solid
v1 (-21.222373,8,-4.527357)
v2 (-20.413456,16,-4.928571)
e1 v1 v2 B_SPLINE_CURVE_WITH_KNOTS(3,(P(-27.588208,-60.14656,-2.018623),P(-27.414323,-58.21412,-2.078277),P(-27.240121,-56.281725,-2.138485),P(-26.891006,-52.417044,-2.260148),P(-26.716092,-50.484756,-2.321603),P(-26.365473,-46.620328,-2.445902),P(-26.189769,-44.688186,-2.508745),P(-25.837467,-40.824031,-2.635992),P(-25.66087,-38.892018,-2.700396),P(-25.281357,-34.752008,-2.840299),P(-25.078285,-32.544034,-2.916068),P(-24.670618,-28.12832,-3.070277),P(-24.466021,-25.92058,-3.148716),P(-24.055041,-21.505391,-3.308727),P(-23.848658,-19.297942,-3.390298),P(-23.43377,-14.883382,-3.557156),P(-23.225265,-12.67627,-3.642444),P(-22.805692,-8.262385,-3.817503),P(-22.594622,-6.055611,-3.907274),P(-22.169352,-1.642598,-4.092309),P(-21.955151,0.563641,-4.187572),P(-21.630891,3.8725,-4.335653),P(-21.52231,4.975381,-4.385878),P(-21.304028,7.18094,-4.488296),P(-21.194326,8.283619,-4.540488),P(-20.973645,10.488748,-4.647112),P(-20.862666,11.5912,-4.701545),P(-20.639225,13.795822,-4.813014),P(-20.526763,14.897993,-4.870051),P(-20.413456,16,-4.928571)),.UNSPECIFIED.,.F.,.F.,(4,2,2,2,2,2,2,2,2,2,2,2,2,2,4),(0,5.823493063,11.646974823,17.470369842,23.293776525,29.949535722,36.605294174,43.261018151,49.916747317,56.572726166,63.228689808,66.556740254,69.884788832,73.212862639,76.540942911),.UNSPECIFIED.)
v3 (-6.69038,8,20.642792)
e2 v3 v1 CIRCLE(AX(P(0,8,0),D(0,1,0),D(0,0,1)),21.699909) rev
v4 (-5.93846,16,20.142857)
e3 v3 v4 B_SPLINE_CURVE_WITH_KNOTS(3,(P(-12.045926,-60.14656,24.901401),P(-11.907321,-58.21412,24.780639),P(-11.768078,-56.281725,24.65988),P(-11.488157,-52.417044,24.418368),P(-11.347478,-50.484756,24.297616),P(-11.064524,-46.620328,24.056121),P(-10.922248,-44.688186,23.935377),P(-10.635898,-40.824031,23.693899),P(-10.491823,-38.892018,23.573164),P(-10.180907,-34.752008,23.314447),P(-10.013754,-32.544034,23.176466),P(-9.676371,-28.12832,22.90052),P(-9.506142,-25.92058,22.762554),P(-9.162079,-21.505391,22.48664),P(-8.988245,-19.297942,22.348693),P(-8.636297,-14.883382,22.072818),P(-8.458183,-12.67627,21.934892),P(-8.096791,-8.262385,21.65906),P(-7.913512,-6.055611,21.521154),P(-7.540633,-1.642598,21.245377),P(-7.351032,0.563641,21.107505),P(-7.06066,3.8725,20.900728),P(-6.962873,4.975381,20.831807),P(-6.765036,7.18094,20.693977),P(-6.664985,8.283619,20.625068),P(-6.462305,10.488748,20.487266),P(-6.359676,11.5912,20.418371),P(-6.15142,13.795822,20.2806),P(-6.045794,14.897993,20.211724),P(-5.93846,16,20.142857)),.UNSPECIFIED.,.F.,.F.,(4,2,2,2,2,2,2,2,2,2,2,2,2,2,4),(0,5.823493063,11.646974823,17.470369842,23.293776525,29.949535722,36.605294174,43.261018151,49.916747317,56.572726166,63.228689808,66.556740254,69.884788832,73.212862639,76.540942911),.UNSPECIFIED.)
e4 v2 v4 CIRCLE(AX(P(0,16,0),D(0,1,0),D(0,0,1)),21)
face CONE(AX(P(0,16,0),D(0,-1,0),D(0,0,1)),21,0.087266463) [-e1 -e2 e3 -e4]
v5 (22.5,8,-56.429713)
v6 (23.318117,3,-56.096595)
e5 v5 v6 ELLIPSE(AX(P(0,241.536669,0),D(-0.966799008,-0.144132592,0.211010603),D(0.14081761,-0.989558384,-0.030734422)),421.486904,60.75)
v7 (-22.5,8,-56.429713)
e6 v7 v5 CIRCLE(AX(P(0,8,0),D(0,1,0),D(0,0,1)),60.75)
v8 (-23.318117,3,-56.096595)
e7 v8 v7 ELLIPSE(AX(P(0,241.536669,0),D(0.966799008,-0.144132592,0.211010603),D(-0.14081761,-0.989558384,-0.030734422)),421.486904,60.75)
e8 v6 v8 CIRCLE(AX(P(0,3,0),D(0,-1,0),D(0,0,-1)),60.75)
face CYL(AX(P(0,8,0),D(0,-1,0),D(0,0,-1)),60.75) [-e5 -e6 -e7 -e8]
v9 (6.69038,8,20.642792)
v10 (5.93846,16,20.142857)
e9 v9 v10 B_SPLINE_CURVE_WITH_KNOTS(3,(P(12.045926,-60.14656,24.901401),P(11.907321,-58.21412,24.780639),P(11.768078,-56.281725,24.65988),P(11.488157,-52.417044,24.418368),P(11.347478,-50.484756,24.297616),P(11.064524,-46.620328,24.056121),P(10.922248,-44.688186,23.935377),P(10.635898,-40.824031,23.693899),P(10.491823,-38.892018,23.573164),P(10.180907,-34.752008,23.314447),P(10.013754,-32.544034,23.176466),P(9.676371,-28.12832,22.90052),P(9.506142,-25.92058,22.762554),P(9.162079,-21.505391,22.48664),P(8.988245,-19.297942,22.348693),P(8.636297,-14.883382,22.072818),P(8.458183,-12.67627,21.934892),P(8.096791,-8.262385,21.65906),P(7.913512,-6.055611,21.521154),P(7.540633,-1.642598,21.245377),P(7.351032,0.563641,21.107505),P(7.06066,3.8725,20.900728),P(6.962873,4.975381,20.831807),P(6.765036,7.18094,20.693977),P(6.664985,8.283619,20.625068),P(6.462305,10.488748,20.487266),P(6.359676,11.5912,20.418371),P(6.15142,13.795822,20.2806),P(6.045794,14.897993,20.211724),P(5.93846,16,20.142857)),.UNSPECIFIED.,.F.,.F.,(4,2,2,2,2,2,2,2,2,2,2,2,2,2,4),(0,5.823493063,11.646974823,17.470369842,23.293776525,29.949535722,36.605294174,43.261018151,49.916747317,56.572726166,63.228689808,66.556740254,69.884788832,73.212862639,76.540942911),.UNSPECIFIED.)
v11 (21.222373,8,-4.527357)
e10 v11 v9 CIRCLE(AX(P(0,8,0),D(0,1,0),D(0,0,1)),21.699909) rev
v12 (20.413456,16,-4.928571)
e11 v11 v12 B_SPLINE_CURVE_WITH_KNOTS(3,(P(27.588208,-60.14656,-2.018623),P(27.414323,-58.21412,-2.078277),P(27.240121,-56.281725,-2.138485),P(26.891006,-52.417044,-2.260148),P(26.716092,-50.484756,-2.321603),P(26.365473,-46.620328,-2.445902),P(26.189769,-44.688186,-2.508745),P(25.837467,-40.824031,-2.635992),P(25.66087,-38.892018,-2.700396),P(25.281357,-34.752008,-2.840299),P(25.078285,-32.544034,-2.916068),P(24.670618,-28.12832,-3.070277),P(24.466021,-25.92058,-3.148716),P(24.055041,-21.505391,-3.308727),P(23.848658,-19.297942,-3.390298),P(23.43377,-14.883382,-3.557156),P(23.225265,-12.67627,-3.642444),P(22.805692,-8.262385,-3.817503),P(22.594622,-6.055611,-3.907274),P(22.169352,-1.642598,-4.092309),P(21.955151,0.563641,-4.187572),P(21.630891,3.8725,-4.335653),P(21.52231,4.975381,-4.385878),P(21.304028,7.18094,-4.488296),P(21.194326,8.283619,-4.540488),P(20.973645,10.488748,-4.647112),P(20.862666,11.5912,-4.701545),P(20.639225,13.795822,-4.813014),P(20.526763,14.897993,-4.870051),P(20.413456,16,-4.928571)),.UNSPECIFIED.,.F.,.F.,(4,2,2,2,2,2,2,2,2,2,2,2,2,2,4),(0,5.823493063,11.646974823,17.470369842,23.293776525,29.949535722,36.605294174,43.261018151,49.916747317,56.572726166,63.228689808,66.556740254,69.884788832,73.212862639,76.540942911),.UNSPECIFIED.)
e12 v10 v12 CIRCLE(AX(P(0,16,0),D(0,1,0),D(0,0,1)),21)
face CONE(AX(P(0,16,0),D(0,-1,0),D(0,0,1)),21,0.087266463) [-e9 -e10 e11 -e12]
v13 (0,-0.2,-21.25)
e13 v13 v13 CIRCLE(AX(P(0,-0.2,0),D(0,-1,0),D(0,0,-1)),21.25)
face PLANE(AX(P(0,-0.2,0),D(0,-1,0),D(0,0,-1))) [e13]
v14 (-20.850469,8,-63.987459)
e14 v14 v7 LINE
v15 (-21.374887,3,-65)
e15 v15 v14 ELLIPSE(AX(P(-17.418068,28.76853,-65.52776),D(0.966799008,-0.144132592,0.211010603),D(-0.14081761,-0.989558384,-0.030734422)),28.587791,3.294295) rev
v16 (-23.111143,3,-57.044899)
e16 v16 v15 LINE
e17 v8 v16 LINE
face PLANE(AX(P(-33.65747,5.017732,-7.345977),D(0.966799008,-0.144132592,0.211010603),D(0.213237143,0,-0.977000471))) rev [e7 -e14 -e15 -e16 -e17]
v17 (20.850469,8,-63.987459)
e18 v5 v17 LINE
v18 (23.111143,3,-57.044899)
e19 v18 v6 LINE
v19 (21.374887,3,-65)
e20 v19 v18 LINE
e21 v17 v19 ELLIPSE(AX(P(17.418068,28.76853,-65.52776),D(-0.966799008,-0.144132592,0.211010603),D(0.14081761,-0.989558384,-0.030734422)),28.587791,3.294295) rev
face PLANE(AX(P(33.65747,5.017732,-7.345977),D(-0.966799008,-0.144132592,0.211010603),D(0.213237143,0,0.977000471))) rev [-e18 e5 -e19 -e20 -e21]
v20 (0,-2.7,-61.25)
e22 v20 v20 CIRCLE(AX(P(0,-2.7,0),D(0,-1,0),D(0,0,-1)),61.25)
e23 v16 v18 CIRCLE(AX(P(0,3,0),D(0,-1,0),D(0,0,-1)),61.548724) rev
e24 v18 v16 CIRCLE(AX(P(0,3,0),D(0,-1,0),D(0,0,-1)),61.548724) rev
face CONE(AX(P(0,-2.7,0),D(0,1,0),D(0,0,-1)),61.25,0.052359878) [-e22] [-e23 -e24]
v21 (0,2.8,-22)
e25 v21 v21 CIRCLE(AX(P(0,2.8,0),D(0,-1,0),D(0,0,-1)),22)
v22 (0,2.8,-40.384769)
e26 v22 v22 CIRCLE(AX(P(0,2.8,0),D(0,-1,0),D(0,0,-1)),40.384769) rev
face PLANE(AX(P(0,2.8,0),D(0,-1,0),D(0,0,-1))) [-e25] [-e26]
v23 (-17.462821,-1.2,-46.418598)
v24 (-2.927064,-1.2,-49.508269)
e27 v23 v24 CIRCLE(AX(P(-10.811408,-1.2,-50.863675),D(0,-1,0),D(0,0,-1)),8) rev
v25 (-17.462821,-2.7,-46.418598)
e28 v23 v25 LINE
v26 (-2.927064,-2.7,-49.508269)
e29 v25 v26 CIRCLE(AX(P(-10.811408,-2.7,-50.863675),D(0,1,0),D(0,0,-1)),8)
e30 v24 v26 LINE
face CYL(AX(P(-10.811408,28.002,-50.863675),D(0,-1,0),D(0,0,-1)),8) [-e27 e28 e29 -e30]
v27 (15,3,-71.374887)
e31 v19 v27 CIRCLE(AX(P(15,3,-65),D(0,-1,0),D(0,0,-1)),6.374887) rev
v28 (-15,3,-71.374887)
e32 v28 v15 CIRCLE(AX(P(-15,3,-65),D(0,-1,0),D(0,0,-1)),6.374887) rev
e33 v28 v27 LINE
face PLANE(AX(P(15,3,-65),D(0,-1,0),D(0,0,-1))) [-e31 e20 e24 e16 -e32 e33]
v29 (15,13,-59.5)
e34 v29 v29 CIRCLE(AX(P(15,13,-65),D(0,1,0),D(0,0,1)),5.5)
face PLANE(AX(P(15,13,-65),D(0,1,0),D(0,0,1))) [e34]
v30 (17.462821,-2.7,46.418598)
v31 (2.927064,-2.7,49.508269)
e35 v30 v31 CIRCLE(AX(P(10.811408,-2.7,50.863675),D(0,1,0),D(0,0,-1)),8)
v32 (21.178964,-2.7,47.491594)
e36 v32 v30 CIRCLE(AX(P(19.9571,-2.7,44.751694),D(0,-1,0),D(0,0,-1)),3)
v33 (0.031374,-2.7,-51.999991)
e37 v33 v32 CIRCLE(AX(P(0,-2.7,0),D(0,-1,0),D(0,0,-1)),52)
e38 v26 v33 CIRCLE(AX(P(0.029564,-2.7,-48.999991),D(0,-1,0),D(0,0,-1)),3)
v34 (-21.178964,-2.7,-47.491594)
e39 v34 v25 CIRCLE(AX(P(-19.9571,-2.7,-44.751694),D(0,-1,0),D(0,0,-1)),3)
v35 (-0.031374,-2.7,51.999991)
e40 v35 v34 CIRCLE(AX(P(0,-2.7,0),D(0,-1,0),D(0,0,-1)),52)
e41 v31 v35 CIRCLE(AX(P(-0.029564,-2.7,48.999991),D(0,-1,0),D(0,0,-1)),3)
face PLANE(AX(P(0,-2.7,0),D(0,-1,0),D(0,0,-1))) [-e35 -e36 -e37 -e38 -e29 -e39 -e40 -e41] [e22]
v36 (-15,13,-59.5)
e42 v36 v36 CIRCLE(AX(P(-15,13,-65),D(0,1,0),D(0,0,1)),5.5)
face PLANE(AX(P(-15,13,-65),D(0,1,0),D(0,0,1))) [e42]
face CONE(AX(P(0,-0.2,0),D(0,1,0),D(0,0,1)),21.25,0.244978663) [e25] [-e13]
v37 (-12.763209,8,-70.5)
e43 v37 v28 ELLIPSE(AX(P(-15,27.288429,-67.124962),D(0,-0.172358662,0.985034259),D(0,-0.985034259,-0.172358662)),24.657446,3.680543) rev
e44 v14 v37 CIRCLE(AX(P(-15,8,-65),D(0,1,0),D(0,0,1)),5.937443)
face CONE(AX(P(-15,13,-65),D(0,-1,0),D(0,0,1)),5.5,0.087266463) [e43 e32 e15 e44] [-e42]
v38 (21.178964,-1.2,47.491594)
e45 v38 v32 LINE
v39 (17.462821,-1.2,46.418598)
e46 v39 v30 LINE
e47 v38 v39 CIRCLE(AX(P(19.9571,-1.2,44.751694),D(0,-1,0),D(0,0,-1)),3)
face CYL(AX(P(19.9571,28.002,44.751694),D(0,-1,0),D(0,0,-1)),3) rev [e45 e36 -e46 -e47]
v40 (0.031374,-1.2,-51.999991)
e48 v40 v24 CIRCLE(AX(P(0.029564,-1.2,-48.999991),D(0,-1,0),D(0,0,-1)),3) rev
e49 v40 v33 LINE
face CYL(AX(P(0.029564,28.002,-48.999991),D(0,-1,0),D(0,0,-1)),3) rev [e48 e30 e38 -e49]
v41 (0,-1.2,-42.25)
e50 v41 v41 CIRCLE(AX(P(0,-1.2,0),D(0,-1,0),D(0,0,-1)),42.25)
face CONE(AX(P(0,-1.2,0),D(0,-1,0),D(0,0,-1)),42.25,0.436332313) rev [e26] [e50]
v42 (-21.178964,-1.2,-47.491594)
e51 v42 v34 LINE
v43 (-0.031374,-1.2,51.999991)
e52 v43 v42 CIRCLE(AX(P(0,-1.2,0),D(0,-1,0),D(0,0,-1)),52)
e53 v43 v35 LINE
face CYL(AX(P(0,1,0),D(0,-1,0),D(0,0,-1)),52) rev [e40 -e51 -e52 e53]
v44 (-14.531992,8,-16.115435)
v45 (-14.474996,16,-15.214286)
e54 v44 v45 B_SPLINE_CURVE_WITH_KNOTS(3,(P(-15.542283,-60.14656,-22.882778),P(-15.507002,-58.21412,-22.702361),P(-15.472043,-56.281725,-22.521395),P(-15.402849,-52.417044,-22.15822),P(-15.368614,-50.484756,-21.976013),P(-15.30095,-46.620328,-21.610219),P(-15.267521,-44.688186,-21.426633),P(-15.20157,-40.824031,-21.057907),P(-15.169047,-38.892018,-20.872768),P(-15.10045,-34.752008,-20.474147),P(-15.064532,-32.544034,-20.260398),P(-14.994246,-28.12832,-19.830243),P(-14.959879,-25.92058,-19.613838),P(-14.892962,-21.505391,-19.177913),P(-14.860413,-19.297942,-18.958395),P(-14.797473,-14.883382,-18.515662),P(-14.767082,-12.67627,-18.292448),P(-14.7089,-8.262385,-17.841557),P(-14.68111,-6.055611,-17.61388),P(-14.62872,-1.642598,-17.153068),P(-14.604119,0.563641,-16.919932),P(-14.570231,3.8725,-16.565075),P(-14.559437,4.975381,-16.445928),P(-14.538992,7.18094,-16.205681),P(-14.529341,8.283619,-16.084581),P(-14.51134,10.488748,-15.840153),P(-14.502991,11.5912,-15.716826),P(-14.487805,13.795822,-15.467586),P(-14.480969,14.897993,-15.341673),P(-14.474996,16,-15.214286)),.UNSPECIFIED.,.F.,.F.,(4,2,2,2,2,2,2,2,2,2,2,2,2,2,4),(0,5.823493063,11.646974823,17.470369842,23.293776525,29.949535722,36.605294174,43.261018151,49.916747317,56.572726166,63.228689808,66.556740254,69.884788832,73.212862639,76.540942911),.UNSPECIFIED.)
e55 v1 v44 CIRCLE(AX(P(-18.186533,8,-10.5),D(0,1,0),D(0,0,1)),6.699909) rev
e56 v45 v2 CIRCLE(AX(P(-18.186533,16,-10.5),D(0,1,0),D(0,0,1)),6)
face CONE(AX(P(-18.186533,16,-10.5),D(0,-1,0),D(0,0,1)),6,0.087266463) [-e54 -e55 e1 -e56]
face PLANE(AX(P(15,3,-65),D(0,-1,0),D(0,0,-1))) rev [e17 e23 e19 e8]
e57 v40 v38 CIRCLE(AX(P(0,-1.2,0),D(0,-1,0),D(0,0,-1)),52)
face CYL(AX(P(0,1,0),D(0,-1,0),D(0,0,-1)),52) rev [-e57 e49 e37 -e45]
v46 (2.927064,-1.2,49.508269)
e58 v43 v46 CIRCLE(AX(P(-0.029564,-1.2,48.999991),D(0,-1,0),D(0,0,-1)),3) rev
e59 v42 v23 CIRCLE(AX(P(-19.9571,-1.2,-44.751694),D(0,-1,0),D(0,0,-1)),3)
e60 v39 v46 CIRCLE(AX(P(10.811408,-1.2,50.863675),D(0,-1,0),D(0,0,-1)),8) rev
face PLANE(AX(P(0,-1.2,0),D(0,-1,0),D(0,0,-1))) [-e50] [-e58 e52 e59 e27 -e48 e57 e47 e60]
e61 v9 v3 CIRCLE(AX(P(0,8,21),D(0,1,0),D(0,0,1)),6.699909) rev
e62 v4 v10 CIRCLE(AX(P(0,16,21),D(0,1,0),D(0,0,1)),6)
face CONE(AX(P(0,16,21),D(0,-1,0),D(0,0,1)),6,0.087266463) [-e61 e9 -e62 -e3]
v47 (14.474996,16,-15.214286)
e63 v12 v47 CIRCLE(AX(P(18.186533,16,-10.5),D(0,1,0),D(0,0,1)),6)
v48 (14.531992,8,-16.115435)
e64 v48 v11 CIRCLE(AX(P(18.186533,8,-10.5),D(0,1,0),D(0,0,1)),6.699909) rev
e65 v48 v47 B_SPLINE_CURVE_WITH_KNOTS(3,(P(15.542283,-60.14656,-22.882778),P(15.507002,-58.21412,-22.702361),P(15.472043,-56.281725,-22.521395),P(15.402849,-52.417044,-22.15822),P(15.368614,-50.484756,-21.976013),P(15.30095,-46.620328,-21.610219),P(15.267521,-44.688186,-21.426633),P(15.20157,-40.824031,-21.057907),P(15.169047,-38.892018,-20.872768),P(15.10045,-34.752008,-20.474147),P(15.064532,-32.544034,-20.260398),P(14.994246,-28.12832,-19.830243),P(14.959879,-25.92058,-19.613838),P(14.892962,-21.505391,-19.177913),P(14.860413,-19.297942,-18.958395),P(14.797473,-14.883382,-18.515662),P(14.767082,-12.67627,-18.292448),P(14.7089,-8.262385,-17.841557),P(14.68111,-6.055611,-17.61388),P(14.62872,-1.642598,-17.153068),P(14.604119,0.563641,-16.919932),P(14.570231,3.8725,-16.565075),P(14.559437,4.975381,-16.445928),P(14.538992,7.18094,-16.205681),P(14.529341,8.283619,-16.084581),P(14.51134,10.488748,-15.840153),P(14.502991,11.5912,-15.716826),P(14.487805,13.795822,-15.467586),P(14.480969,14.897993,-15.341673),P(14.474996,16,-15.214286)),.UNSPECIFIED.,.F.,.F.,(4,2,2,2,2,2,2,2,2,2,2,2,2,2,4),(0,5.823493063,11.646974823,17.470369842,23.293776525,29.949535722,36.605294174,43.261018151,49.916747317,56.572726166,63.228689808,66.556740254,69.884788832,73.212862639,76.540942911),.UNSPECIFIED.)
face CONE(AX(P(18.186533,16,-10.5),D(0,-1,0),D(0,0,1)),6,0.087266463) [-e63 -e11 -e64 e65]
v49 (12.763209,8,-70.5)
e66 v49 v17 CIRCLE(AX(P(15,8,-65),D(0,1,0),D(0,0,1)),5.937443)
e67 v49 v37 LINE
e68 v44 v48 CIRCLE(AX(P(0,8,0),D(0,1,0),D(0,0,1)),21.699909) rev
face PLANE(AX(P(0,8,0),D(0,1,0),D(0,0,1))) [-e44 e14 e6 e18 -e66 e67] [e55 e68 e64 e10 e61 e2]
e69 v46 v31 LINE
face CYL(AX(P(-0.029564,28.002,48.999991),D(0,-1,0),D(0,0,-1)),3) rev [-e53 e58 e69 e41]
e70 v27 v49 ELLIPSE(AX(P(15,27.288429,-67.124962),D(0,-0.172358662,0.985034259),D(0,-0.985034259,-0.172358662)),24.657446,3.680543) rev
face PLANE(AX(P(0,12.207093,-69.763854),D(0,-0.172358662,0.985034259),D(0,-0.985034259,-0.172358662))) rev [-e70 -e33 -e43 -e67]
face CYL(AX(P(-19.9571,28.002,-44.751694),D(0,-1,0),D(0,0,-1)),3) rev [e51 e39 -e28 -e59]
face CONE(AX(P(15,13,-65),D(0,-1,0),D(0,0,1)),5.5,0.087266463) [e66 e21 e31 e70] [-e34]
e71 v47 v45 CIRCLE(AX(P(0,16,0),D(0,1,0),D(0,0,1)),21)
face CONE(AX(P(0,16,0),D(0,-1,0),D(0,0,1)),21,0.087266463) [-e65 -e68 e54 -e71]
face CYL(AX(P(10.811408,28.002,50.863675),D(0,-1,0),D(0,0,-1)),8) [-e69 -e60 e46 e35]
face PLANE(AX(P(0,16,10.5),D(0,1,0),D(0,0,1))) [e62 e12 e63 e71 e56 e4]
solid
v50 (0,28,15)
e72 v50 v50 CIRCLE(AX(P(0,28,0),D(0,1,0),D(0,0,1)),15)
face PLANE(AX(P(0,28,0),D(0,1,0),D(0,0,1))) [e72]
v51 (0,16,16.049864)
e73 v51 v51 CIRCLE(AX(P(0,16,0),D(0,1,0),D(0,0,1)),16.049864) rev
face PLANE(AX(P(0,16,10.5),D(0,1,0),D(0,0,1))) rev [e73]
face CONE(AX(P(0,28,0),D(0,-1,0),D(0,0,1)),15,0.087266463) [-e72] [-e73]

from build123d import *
from build123d.topology import SkipClean

# Parameters (mm, degrees)
SKETCH1_R                      = 60.75
BOSS_EXTRUDE1_DEPTH            = 8
BOSS_EXTRUDE3_DEPTH            = 8
SKETCH3_R                      = 15
SKETCH3_R_2                    = 10
BOSS_EXTRUDE4_DEPTH            = 12
BOSS_EXTRUDE5_START            = -5
BOSS_EXTRUDE5_DEPTH            = 5
SKETCH5_R                      = 5.500000000000001
SKETCH5_R_2                    = 5.499999999999997
BOSS_EXTRUDE6_DEPTH            = 5
SKETCH11_R                     = 52
CUT_EXTRUDE4_DEPTH             = 1
SKETCH12_R                     = 42.5
CUT_EXTRUDE5_DEPTH             = 4
BOSS_EXTRUDE7_START            = 2
SKETCH13_R                     = 21
SKETCH13_R_2                   = 10
BOSS_EXTRUDE7_DEPTH            = 2
BOSS_EXTRUDE8_START            = 2.2
SKETCH14_R                     = 60.75
SKETCH14_R_2                   = 52.000000000000014
BOSS_EXTRUDE8_DEPTH            = 2.2
BOSS_EXTRUDE9_START            = 2.2
SKETCH15_R                     = 52.000000000000014
SKETCH15_R_2                   = 42.500000000000014
BOSS_EXTRUDE9_DEPTH            = 2.2
BOSS_EXTRUDE10_START           = 2.2
SKETCH16_R                     = 42.50000000000002
SKETCH16_R_2                   = 21
BOSS_EXTRUDE10_DEPTH           = 2.2
BOSS_EXTRUDE11_START           = 2.2
SKETCH17_R                     = 21
SKETCH17_R_2                   = 10
BOSS_EXTRUDE11_DEPTH           = 2.2
BOSS_EXTRUDE12_REACH           = 99.841
SKETCH20_R                     = 14.5
CUT_EXTRUDE6_DEPTH             = 6
BOSS_EXTRUDE13_START           = 6
SKETCH22_R                     = 14.5
BOSS_EXTRUDE13_DEPTH           = 6
SKETCH23_R                     = 10
BOSS_EXTRUDE14_DEPTH           = 12
CUT_EXTRUDE7_START             = -12
SKETCH24_R                     = 15
CUT_EXTRUDE7_DEPTH             = 12
CUT_EXTRUDE8_START             = -8
CUT_EXTRUDE8_DEPTH             = 8
BOSS_EXTRUDE16_DEPTH           = 8
BOSS_EXTRUDE16_DRAFT           = 5
SKETCH25_R                     = 15
BOSS_EXTRUDE15_DEPTH           = 12
BOSS_EXTRUDE15_DRAFT           = 5.000000000000003
CUT_EXTRUDE9_START             = -5
SKETCH29_R                     = 5.500000000000004
SKETCH29_R_2                   = 5.499999999999987
CUT_EXTRUDE9_DEPTH             = 5
SKETCH30_R                     = 5.499999999999987
BOSS_EXTRUDE17_DEPTH           = 10
BOSS_EXTRUDE17_DRAFT           = 5.000000000000003
SKETCH30_R_2                   = 5.500000000000005
BOSS_EXTRUDE17_PROFILE_2_DEPTH = 10
BOSS_EXTRUDE17_PROFILE_2_DRAFT = 5.000000000000003
CUT_EXTRUDE14_START            = 10
SKETCH40_R                     = 42.75
SKETCH40_R_2                   = 21
CUT_EXTRUDE14_DEPTH            = 10
SKETCH43_R                     = 20.82502267294815
BOSS_EXTRUDE19_DEPTH           = 1
BOSS_EXTRUDE19_TAPER           = 5.000000000000003
SKETCH45_R                     = 61.25
SKETCH45_R_2                   = 60.75
BOSS_EXTRUDE21_DEPTH           = 5.7
BOSS_EXTRUDE21_DRAFT           = 3.000000000000002
BOSS_EXTRUDE22_START           = 0.5
SKETCH46_R                     = 60.75
BOSS_EXTRUDE22_DEPTH           = 0.5
SKETCH47_R                     = 22
SKETCH48_R                     = 21.25
SKETCH50_R                     = 43.099954654103705
SKETCH50_R_2                   = 42.25000000000001
BOSS_EXTRUDE23_DEPTH           = 4
BOSS_EXTRUDE23_DRAFT           = 25.000000000000018


# Read off the part's stored shape, not the designer's step: Boss-Extrude16, Cut-Extrude15
with BuildPart() as part:
    # Sketch1 → Boss-Extrude1 (new body)
    with BuildSketch(Plane(origin=(0, 0, 0), x_dir=(1, 0, 0), z_dir=(0, 1, 0))):
        with Locations(Location((0, 0, 0), (0, 0, 270))):
            Circle(SKETCH1_R)
    extrude(amount=BOSS_EXTRUDE1_DEPTH)

    # Sketch2 → Boss-Extrude3 (add)
    with BuildSketch(Plane(origin=(0, 8, 0), x_dir=(1, 0, 0), z_dir=(0, 1, 0))):
        with BuildLine():
            ThreePointArc((5.938459911664728, -20.142857142857142), (-6.444e-14, -27.000000000000057), (-5.938459911664823, -20.142857142857114))
            ThreePointArc((-5.938459911664823, -20.142857142857114), (-18.186533479473233, -10.499999999999973), (-20.413455946347497, 4.928571428571383))
            ThreePointArc((-20.413455946347497, 4.928571428571383), (-23.382685902179873, 13.499999999999936), (-14.474996034682798, 15.214285714285683))
            ThreePointArc((-14.474996034682798, 15.214285714285683), (1.29e-15, 21.000000000000004), (14.474996034682793, 15.214285714285687))
            ThreePointArc((14.474996034682793, 15.214285714285687), (23.38268590217988, 13.499999999999948), (20.413455946347494, 4.928571428571376))
            ThreePointArc((20.413455946347494, 4.928571428571376), (18.186533479473198, -10.500000000000021), (5.938459911664728, -20.142857142857142))
        make_face()
    extrude(amount=BOSS_EXTRUDE3_DEPTH)

    # Sketch3 → Boss-Extrude4 (add)
    with BuildSketch(Plane(origin=(0, 16, 0), x_dir=(1, 0, 0), z_dir=(0, 1, 0))):
        with Locations(Location((0, 0, 0), (0, 0, 270))):
            Circle(SKETCH3_R)
        with Locations(Location((0, 0, 0), (0, 0, 270))):
            Circle(SKETCH3_R_2, mode=Mode.SUBTRACT)
    extrude(amount=BOSS_EXTRUDE4_DEPTH)

    # Sketch4 → Boss-Extrude5 (add)
    with BuildSketch(Plane(origin=(0, 8, 0), x_dir=(1, 0, 0), z_dir=(0, 1, 0)).offset(BOSS_EXTRUDE5_START)):
        with BuildLine():
            Line((-15.000000000000002, 70.5), (15.000000000000002, 70.5))
            ThreePointArc((15.000000000000002, 70.5), (18.449606964363085, 69.2837147187246), (20.37350259165708, 66.17280428778827))
            Line((20.37350259165708, 66.17280428778827), (22.5, 56.42971291793003))
            ThreePointArc((22.5, 56.42971291793003), (3.72e-15, 60.75), (-22.5, 56.42971291793003))
            Line((-22.5, 56.42971291793003), (-20.37350259165708, 66.17280428778827))
            ThreePointArc((-20.37350259165708, 66.17280428778827), (-18.449606964363085, 69.2837147187246), (-15.000000000000002, 70.5))
        make_face()
    extrude(amount=BOSS_EXTRUDE5_DEPTH)

    # Sketch5 → Boss-Extrude6 (add)
    with SkipClean():  # the faces are left unmerged after this step: merging them gives an invalid solid
        with BuildSketch(Plane(origin=(0, 8, 0), x_dir=(1, 0, 0), z_dir=(0, 1, 0))):
            with Locations(Location((-15, 64.99999999999999, 0), (0, 0, 270))):
                Circle(SKETCH5_R)
            with Locations(Location((15, 64.99999999999999, 0), (0, 0, 90))):
                Circle(SKETCH5_R_2)
        extrude(amount=BOSS_EXTRUDE6_DEPTH)

    # Sketch11 → Cut-Extrude4 (cut)
    with SkipClean():  # the faces are left unmerged after this step: merging them gives an invalid solid
        with BuildSketch(Plane.XZ):
            with Locations(Location((0, 0, 0), (0, 0, 270))):
                Circle(SKETCH11_R)
        extrude(amount=-CUT_EXTRUDE4_DEPTH, mode=Mode.SUBTRACT)

    # Sketch12 → Cut-Extrude5 (cut)
    with SkipClean():  # the faces are left unmerged after this step: merging them gives an invalid solid
        with BuildSketch(Plane.XZ.offset(-1)):
            with Locations(Location((0, 0, 0), (0, 0, 270))):
                Circle(SKETCH12_R)
        extrude(amount=-CUT_EXTRUDE5_DEPTH, mode=Mode.SUBTRACT)

    # Sketch13 → Boss-Extrude7 (add)
    with SkipClean():  # the faces are left unmerged after this step: merging them gives an invalid solid
        with BuildSketch(Plane.XZ.offset(-5).offset(BOSS_EXTRUDE7_START)):
            with Locations(Location((0, 0, 0), (0, 0, 270))):
                Circle(SKETCH13_R)
            with Locations(Location((0, 0, 0), (0, 0, 90))):
                Circle(SKETCH13_R_2, mode=Mode.SUBTRACT)
        extrude(amount=-BOSS_EXTRUDE7_DEPTH)

    # Sketch14 → Boss-Extrude8 (add)
    with BuildSketch(Plane.XZ.offset(BOSS_EXTRUDE8_START)):
        with Locations(Location((0, 0, 0), (0, 0, 270))):
            Circle(SKETCH14_R)
        with Locations(Location((0, 0, 0), (0, 0, 270))):
            Circle(SKETCH14_R_2, mode=Mode.SUBTRACT)
    extrude(amount=-BOSS_EXTRUDE8_DEPTH)

    # Sketch15 → Boss-Extrude9 (add)
    with BuildSketch(Plane.XZ.offset(-1).offset(BOSS_EXTRUDE9_START)):
        with Locations(Location((0, 0, 0), (0, 0, 270))):
            Circle(SKETCH15_R)
        with Locations(Location((0, 0, 0), (0, 0, 270))):
            Circle(SKETCH15_R_2, mode=Mode.SUBTRACT)
    extrude(amount=-BOSS_EXTRUDE9_DEPTH)

    # Sketch16 → Boss-Extrude10 (add)
    with BuildSketch(Plane.XZ.offset(-5).offset(BOSS_EXTRUDE10_START)):
        with Locations(Location((0, 0, 0), (0, 0, 270))):
            Circle(SKETCH16_R)
        with Locations(Location((0, 0, 0), (0, 0, 270))):
            Circle(SKETCH16_R_2, mode=Mode.SUBTRACT)
    extrude(amount=-BOSS_EXTRUDE10_DEPTH)

    # Sketch17 → Boss-Extrude11 (add)
    with BuildSketch(Plane.XZ.offset(-3).offset(BOSS_EXTRUDE11_START)):
        with Locations(Location((0, 0, 0), (0, 0, 270))):
            Circle(SKETCH17_R)
        with Locations(Location((0, 0, 0), (0, 0, 90))):
            Circle(SKETCH17_R_2, mode=Mode.SUBTRACT)
    extrude(amount=-BOSS_EXTRUDE11_DEPTH)

    # Sketch18 → Boss-Extrude12 (add, up to next)
    with BuildSketch(Plane.XZ.offset(2.2), mode=Mode.PRIVATE) as boss_extrude12_sk1:
        with BuildLine():
            ThreePointArc((0, 52), (-0.01568724474421835, 51.99999763375334), (-0.03137448806074861, 51.99999053501355))
            ThreePointArc((-0.03137448806074783, 51.99999053501355), (1.9030265971459484, 51.294569899693556), (2.9270643996395953, 49.508268578457944))
            ThreePointArc((2.9270643996395966, 49.508268578457944), (9.148114395981406, 43.03849443228744), (17.46282057957898, 46.41859822357625))
            ThreePointArc((17.46282057957898, 46.41859822357625), (19.124879865422606, 47.63395198340303), (21.178963611238554, 47.49159399676782))
            ThreePointArc((21.17896361123856, 47.491593996767826), (10.826751871361822, 50.86041136204036), (3.18e-15, 52.00000000000001))
        make_face()
    boss_extrude12_tool1 = extrude(boss_extrude12_sk1.sketch, amount=-BOSS_EXTRUDE12_REACH, mode=Mode.PRIVATE) - part.part
    # Sketch18 → Boss-Extrude12 (add, up to next)
    with BuildSketch(Plane.XZ.offset(2.2), mode=Mode.PRIVATE) as boss_extrude12_sk2:
        with BuildLine():
            ThreePointArc((0.03137448806111159, -51.99999053501355), (-1.9030265971455897, -51.29456989969357), (-2.9270643996392525, -49.508268578457965))
            ThreePointArc((-2.9270643996392494, -49.508268578457965), (-9.148114395981109, -43.0384944322875), (-17.46282057957866, -46.418598223576375))
            ThreePointArc((-17.46282057957866, -46.418598223576375), (-19.124879865422272, -47.633951983403165), (-21.17896361123822, -47.49159399676797))
            ThreePointArc((-21.17896361123824, -47.49159399676797), (-10.81140792252315, -50.863675238157974), (0.03137448806108981, -51.99999053501356))
        make_face()
    boss_extrude12_tool2 = extrude(boss_extrude12_sk2.sketch, amount=-BOSS_EXTRUDE12_REACH, mode=Mode.PRIVATE) - part.part
    add(boss_extrude12_tool1.solids().sort_by_distance((10.097222, -2.2, 47.503693))[0])
    add(boss_extrude12_tool2.solids().sort_by_distance((-10.097222, -2.2, -47.503693))[0])

    # Sketch20 → Cut-Extrude6 (cut)
    with BuildSketch(Plane.XZ.offset(-0.7999999999999999)):
        with Locations(Location((0, 0, 0), (0, 0, 270))):
            Circle(SKETCH20_R)
    extrude(amount=-CUT_EXTRUDE6_DEPTH, mode=Mode.SUBTRACT)

    # Sketch22 → Boss-Extrude13 (add)
    with BuildSketch(Plane.XZ.offset(-6.800000000000001).offset(BOSS_EXTRUDE13_START)):
        Circle(SKETCH22_R)
    extrude(amount=-BOSS_EXTRUDE13_DEPTH)

    # Sketch23 → Boss-Extrude14 (add)
    with BuildSketch(Plane(origin=(0, 16, 0), x_dir=(1, 0, 0), z_dir=(0, 1, 0))):
        Circle(SKETCH23_R)
    extrude(amount=BOSS_EXTRUDE14_DEPTH)

    # Sketch24 → Cut-Extrude7 (cut)
    with BuildSketch(Plane(origin=(0, 28, 0), x_dir=(1, 0, 0), z_dir=(0, 1, 0)).offset(CUT_EXTRUDE7_START)):
        Circle(SKETCH24_R)
    extrude(amount=CUT_EXTRUDE7_DEPTH, mode=Mode.SUBTRACT)

    # Sketch26 → Cut-Extrude8 (cut)
    with BuildSketch(Plane(origin=(0, 16, 0), x_dir=(1, 0, 0), z_dir=(0, 1, 0)).offset(CUT_EXTRUDE8_START)):
        with BuildLine():
            ThreePointArc((5.938459911664719, -20.142857142857142), (18.186533479473198, -10.500000000000023), (20.413455946347494, 4.928571428571378))
            ThreePointArc((20.413455946347494, 4.928571428571378), (23.38268590217988, 13.499999999999948), (14.474996034682793, 15.214285714285683))
            ThreePointArc((14.474996034682793, 15.214285714285683), (-8.04e-15, 21), (-14.474996034682805, 15.214285714285678))
            ThreePointArc((-14.474996034682805, 15.214285714285678), (-23.382685902179873, 13.49999999999994), (-20.4134559463475, 4.928571428571381))
            ThreePointArc((-20.4134559463475, 4.928571428571381), (-18.186533479473237, -10.499999999999975), (-5.938459911664835, -20.142857142857114))
            ThreePointArc((-5.938459911664835, -20.142857142857114), (-6.191e-14, -27.000000000000068), (5.938459911664719, -20.142857142857142))
        make_face()
    extrude(amount=CUT_EXTRUDE8_DEPTH, mode=Mode.SUBTRACT)


with BuildPart() as boss_extrude16_tool:
    # Boss-Extrude16 outline → Boss-Extrude16 (with draft: the straight prism first)
    with BuildSketch(Plane(origin=(0, 16, 0), x_dir=(1, 0, 0), z_dir=(0, 1, 0))):
        with BuildLine():
            ThreePointArc((-5.938459912, -20.142857143), (0, -27), (5.938459912, -20.142857143))
            ThreePointArc((5.938459912, -20.142857143), (18.186533479, -10.5), (20.413455946, 4.928571429))
            ThreePointArc((20.413455946, 4.928571429), (23.382685902, 13.5), (14.474996035, 15.214285714))
            ThreePointArc((14.474996035, 15.214285714), (0, 21), (-14.474996035, 15.214285714))
            ThreePointArc((-14.474996035, 15.214285714), (-23.382685902, 13.5), (-20.413455946, 4.928571429))
            ThreePointArc((-20.413455946, 4.928571429), (-18.186533479, -10.5), (-5.938459912, -20.142857143))
        make_face()
    extrude(amount=-BOSS_EXTRUDE16_DEPTH)
    # Boss-Extrude16: the draft: its side faces are tilted about the plane it starts from
    boss_extrude16_sides = [boss_extrude16_tool.faces().sort_by_distance(p)[0] for p in [
        (0, 12, 27),
        (18.186533479, 12, 10.5),
        (23.382685902, 12, -13.5),
        (0, 12, -21),
        (-23.382685902, 12, -13.5),
        (-18.186533479, 12, 10.5),
    ]]
    draft(boss_extrude16_sides, Plane(origin=(0, 16, 0), x_dir=(1, 0, 0), z_dir=(0, 1, 0)), BOSS_EXTRUDE16_DRAFT)


with BuildPart() as part_1:
    add(part.part)

    # Boss-Extrude16: add boss_extrude16_tool
    add(boss_extrude16_tool.part)

    # Sketch29 → Cut-Extrude9 (cut)
    with BuildSketch(Plane(origin=(0, 13.000000000000002, 0), x_dir=(1, 0, 0), z_dir=(0, 1, 0)).offset(CUT_EXTRUDE9_START)):
        with Locations((-15, 64.99999999999999)):
            Circle(SKETCH29_R)
        with Locations((15, 64.99999999999999)):
            Circle(SKETCH29_R_2)
    extrude(amount=CUT_EXTRUDE9_DEPTH, mode=Mode.SUBTRACT)


with BuildPart() as body_2:
    # Sketch25 → Boss-Extrude15 (with draft: the straight prism first)
    with BuildSketch(Plane(origin=(0, 28, 0), x_dir=(1, 0, 0), z_dir=(0, 1, 0))):
        Circle(SKETCH25_R)
    extrude(amount=-BOSS_EXTRUDE15_DEPTH)
    # Boss-Extrude15: the draft: its side faces are tilted about the plane it starts from
    boss_extrude15_sides = [body_2.faces().sort_by_distance(p)[0] for p in [
        (-15, 22, 0),
    ]]
    draft(boss_extrude15_sides, Plane(origin=(0, 28, 0), x_dir=(1, 0, 0), z_dir=(0, 1, 0)), BOSS_EXTRUDE15_DRAFT)


with BuildPart() as boss_extrude17_tool:
    # Sketch30 → Boss-Extrude17 (with draft: the straight prism first)
    with BuildSketch(Plane(origin=(0, 13.000000000000002, 0), x_dir=(1, 0, 0), z_dir=(0, 1, 0))):
        with Locations((15, 64.99999999999999)):
            Circle(SKETCH30_R)
    extrude(amount=-BOSS_EXTRUDE17_DEPTH)
    # Boss-Extrude17: the draft: its side faces are tilted about the plane it starts from
    boss_extrude17_sides = [boss_extrude17_tool.faces().sort_by_distance(p)[0] for p in [
        (9.5, 8, -65),
    ]]
    draft(boss_extrude17_sides, Plane(origin=(0, 13.000000000000002, 0), x_dir=(1, 0, 0), z_dir=(0, 1, 0)), BOSS_EXTRUDE17_DRAFT)


with BuildPart() as part_2:
    add(part_1.part)

    # Boss-Extrude17: add boss_extrude17_tool
    add(boss_extrude17_tool.part)


with BuildPart() as boss_extrude17_profile_2_tool:
    # Sketch30 → Boss-Extrude17 profile 2 (with draft: the straight prism first)
    with BuildSketch(Plane(origin=(0, 13.000000000000002, 0), x_dir=(1, 0, 0), z_dir=(0, 1, 0))):
        with Locations((-15, 64.99999999999999)):
            Circle(SKETCH30_R_2)
    extrude(amount=-BOSS_EXTRUDE17_PROFILE_2_DEPTH)
    # Boss-Extrude17 profile 2: the draft: its side faces are tilted about the plane it starts from
    boss_extrude17_profile_2_sides = [boss_extrude17_profile_2_tool.faces().sort_by_distance(p)[0] for p in [
        (-20.5, 8, -65),
    ]]
    draft(boss_extrude17_profile_2_sides, Plane(origin=(0, 13.000000000000002, 0), x_dir=(1, 0, 0), z_dir=(0, 1, 0)), BOSS_EXTRUDE17_PROFILE_2_DRAFT)


with BuildPart() as part_3:
    add(part_2.part)

    # Boss-Extrude17 profile 2: add boss_extrude17_profile_2_tool
    add(boss_extrude17_profile_2_tool.part)

    # Sketch35 for Loft1 → Loft1 section 0
    with BuildSketch(Plane(origin=(0, 8, 0), x_dir=(1, 0, 0), z_dir=(0, 1, 0))):
        with BuildLine():
            Line((-20.85046947506008, 63.987458607535004), (-22.500000000000007, 56.42971291793004))
            # circular arc as an exact rational Bezier (weights 1, cos(half-angle), 1)
            Bezier((-22.500000000000007, 56.42971291793004), (0, 65.401050425), (22.500000000000004, 56.42971291793004), weights=[1, 0.928884163258, 1])
            Line((22.500000000000004, 56.42971291793004), (20.85046947506007, 63.98745860753506))
            Bezier((20.85046947506007, 63.98745860753506), (22.675263086, 74.531125659), (12.763209185000878, 70.5), weights=[1, 0.485191442362, 1])
            Line((12.763209185000878, 70.5), (-12.763209185000829, 70.5))
            Bezier((-12.763209185000829, 70.5), (-22.675263086, 74.531125659), (-20.85046947506008, 63.987458607535004), weights=[1, 0.485191442362, 1])
        make_face()
    # Sketch34 for Loft1 → Loft1 section 1
    with BuildSketch(Plane.XZ.offset(-3)):
        with BuildLine():
            Line((-21.374886635259248, -65.00000000000003), (-23.318116732321744, -56.09659465651917))
            Bezier((-23.318116732321744, -56.09659465651917), (0, -65.789421312), (23.318116732321744, -56.09659465651917), weights=[1, 0.923400735087, 1])
            Line((23.318116732321744, -56.09659465651917), (21.374886635259248, -65.00000000000003))
            Bezier((21.374886635259248, -65.00000000000003), (21.374886635, -71.374886635), (15.000000000000066, -71.37488663525922), weights=[1, 0.707106781187, 1])
            Line((15.000000000000066, -71.37488663525922), (-14.999999999999934, -71.37488663525923))
            Bezier((-14.999999999999934, -71.37488663525923), (-21.374886635, -71.374886635), (-21.374886635259248, -65.00000000000003), weights=[1, 0.707106781187, 1])
        make_face()
    loft()

    # Sketch40 → Cut-Extrude14 (cut)
    with BuildSketch(Plane.XZ.offset(-2.8).offset(CUT_EXTRUDE14_START)):
        with Locations(Location((0, 0, 0), (0, 0, 270))):
            Circle(SKETCH40_R)
        with Locations(Location((0, 0, 0), (0, 0, 270))):
            Circle(SKETCH40_R_2, mode=Mode.SUBTRACT)
    extrude(amount=-CUT_EXTRUDE14_DEPTH, mode=Mode.SUBTRACT)

    # Cut-Extrude15 outline → Cut-Extrude15 (revolve, cut)
    with BuildSketch(Plane.XY):
        Polygon((42.75, 2.8), (42.75, -1.2), (43.099954654, -1.2), align=None)
        Polygon((21, 0.8), (21, 2.8), (20.825022673, 0.8), align=None)
    revolve(axis=Axis((0, 0, 0), (0, 1, 0)), mode=Mode.SUBTRACT)

    # Sketch43 → Boss-Extrude19 (add)
    with BuildSketch(Plane.XZ.offset(-0.7999999999999999)):
        Circle(SKETCH43_R)
    extrude(amount=BOSS_EXTRUDE19_DEPTH, taper=BOSS_EXTRUDE19_TAPER)


with BuildPart() as boss_extrude21_tool:
    # Sketch45 → Boss-Extrude21 (with draft: the straight prism first)
    with BuildSketch(Plane(origin=(0, -2.7, 0), x_dir=(-1, 0, 0), z_dir=(0, -1, 0))):
        Circle(SKETCH45_R)
        Circle(SKETCH45_R_2, mode=Mode.SUBTRACT)
    extrude(amount=-BOSS_EXTRUDE21_DEPTH)
    # Boss-Extrude21: the draft: its side faces are tilted about the plane it starts from
    boss_extrude21_sides = [boss_extrude21_tool.faces().sort_by_distance(p)[0] for p in [
        (61.25, 0.15, 0),
        (60.75, 0.15, 0),
    ]]
    draft(boss_extrude21_sides, Plane(origin=(0, -2.7, 0), x_dir=(-1, 0, 0), z_dir=(0, -1, 0)), BOSS_EXTRUDE21_DRAFT)


with BuildPart() as part_4:
    add(part_3.part)

    # Boss-Extrude21: add boss_extrude21_tool
    add(boss_extrude21_tool.part)

    # Sketch46 → Boss-Extrude22 (add)
    with BuildSketch(Plane.XZ.offset(2.2).offset(BOSS_EXTRUDE22_START)):
        Circle(SKETCH46_R)
        with BuildLine():
            ThreePointArc((-0.03137448806074879, 51.99999053501356), (-50.86367523815793, 10.811407922523328), (-21.178963611238228, -47.491593996767975))
            ThreePointArc((-21.178963611238228, -47.491593996767975), (-19.124879865422272, -47.63395198340318), (-17.46282057957866, -46.418598223576375))
            ThreePointArc((-17.46282057957866, -46.418598223576375), (-9.14811439598111, -43.0384944322875), (-2.9270643996392507, -49.508268578457965))
            ThreePointArc((-2.9270643996392507, -49.508268578457965), (-1.9030265971455884, -51.29456989969357), (0.03137448806111191, -51.99999053501356))
            ThreePointArc((0.03137448806111191, -51.99999053501356), (50.86367523815794, -10.81140792252331), (21.17896361123855, 47.491593996767826))
            ThreePointArc((21.17896361123855, 47.491593996767826), (19.124879865422596, 47.63395198340304), (17.462820579578977, 46.41859822357625))
            ThreePointArc((17.462820579578977, 46.41859822357625), (9.148114395981402, 43.03849443228744), (2.927064399639594, 49.50826857845795))
            ThreePointArc((2.927064399639594, 49.50826857845795), (1.9030265971459435, 51.294569899693556), (-0.03137448806074879, 51.99999053501356))
        make_face(mode=Mode.SUBTRACT)
    extrude(amount=-BOSS_EXTRUDE22_DEPTH)

    # Sketch47 → Loft4 section 0
    with BuildSketch(Plane.XZ.offset(-2.8)):
        Circle(SKETCH47_R)
    # Sketch48 → Loft4 section 1
    with BuildSketch(Plane.XZ.offset(0.2000000000000001)):
        Circle(SKETCH48_R)
    loft()


with BuildPart() as boss_extrude23_tool:
    # Sketch50 → Boss-Extrude23 (with draft: the straight prism first)
    with BuildSketch(Plane.XZ.offset(1.2000000000000002)):
        Circle(SKETCH50_R)
        Circle(SKETCH50_R_2, mode=Mode.SUBTRACT)
    extrude(amount=-BOSS_EXTRUDE23_DEPTH)
    # Boss-Extrude23: the draft: its side faces are tilted about the plane it starts from
    boss_extrude23_sides = [boss_extrude23_tool.faces().sort_by_distance(p)[0] for p in [
        (-43.099954654, 0.8, 0),
        (-42.25, 0.8, 0),
    ]]
    draft(boss_extrude23_sides, Plane.XZ.offset(1.2000000000000002), BOSS_EXTRUDE23_DRAFT)


with BuildPart() as part_5:
    add(part_4.part)

    # Boss-Extrude23: add boss_extrude23_tool
    add(boss_extrude23_tool.part)


solid = Compound([body_2.part, part_5.part])
